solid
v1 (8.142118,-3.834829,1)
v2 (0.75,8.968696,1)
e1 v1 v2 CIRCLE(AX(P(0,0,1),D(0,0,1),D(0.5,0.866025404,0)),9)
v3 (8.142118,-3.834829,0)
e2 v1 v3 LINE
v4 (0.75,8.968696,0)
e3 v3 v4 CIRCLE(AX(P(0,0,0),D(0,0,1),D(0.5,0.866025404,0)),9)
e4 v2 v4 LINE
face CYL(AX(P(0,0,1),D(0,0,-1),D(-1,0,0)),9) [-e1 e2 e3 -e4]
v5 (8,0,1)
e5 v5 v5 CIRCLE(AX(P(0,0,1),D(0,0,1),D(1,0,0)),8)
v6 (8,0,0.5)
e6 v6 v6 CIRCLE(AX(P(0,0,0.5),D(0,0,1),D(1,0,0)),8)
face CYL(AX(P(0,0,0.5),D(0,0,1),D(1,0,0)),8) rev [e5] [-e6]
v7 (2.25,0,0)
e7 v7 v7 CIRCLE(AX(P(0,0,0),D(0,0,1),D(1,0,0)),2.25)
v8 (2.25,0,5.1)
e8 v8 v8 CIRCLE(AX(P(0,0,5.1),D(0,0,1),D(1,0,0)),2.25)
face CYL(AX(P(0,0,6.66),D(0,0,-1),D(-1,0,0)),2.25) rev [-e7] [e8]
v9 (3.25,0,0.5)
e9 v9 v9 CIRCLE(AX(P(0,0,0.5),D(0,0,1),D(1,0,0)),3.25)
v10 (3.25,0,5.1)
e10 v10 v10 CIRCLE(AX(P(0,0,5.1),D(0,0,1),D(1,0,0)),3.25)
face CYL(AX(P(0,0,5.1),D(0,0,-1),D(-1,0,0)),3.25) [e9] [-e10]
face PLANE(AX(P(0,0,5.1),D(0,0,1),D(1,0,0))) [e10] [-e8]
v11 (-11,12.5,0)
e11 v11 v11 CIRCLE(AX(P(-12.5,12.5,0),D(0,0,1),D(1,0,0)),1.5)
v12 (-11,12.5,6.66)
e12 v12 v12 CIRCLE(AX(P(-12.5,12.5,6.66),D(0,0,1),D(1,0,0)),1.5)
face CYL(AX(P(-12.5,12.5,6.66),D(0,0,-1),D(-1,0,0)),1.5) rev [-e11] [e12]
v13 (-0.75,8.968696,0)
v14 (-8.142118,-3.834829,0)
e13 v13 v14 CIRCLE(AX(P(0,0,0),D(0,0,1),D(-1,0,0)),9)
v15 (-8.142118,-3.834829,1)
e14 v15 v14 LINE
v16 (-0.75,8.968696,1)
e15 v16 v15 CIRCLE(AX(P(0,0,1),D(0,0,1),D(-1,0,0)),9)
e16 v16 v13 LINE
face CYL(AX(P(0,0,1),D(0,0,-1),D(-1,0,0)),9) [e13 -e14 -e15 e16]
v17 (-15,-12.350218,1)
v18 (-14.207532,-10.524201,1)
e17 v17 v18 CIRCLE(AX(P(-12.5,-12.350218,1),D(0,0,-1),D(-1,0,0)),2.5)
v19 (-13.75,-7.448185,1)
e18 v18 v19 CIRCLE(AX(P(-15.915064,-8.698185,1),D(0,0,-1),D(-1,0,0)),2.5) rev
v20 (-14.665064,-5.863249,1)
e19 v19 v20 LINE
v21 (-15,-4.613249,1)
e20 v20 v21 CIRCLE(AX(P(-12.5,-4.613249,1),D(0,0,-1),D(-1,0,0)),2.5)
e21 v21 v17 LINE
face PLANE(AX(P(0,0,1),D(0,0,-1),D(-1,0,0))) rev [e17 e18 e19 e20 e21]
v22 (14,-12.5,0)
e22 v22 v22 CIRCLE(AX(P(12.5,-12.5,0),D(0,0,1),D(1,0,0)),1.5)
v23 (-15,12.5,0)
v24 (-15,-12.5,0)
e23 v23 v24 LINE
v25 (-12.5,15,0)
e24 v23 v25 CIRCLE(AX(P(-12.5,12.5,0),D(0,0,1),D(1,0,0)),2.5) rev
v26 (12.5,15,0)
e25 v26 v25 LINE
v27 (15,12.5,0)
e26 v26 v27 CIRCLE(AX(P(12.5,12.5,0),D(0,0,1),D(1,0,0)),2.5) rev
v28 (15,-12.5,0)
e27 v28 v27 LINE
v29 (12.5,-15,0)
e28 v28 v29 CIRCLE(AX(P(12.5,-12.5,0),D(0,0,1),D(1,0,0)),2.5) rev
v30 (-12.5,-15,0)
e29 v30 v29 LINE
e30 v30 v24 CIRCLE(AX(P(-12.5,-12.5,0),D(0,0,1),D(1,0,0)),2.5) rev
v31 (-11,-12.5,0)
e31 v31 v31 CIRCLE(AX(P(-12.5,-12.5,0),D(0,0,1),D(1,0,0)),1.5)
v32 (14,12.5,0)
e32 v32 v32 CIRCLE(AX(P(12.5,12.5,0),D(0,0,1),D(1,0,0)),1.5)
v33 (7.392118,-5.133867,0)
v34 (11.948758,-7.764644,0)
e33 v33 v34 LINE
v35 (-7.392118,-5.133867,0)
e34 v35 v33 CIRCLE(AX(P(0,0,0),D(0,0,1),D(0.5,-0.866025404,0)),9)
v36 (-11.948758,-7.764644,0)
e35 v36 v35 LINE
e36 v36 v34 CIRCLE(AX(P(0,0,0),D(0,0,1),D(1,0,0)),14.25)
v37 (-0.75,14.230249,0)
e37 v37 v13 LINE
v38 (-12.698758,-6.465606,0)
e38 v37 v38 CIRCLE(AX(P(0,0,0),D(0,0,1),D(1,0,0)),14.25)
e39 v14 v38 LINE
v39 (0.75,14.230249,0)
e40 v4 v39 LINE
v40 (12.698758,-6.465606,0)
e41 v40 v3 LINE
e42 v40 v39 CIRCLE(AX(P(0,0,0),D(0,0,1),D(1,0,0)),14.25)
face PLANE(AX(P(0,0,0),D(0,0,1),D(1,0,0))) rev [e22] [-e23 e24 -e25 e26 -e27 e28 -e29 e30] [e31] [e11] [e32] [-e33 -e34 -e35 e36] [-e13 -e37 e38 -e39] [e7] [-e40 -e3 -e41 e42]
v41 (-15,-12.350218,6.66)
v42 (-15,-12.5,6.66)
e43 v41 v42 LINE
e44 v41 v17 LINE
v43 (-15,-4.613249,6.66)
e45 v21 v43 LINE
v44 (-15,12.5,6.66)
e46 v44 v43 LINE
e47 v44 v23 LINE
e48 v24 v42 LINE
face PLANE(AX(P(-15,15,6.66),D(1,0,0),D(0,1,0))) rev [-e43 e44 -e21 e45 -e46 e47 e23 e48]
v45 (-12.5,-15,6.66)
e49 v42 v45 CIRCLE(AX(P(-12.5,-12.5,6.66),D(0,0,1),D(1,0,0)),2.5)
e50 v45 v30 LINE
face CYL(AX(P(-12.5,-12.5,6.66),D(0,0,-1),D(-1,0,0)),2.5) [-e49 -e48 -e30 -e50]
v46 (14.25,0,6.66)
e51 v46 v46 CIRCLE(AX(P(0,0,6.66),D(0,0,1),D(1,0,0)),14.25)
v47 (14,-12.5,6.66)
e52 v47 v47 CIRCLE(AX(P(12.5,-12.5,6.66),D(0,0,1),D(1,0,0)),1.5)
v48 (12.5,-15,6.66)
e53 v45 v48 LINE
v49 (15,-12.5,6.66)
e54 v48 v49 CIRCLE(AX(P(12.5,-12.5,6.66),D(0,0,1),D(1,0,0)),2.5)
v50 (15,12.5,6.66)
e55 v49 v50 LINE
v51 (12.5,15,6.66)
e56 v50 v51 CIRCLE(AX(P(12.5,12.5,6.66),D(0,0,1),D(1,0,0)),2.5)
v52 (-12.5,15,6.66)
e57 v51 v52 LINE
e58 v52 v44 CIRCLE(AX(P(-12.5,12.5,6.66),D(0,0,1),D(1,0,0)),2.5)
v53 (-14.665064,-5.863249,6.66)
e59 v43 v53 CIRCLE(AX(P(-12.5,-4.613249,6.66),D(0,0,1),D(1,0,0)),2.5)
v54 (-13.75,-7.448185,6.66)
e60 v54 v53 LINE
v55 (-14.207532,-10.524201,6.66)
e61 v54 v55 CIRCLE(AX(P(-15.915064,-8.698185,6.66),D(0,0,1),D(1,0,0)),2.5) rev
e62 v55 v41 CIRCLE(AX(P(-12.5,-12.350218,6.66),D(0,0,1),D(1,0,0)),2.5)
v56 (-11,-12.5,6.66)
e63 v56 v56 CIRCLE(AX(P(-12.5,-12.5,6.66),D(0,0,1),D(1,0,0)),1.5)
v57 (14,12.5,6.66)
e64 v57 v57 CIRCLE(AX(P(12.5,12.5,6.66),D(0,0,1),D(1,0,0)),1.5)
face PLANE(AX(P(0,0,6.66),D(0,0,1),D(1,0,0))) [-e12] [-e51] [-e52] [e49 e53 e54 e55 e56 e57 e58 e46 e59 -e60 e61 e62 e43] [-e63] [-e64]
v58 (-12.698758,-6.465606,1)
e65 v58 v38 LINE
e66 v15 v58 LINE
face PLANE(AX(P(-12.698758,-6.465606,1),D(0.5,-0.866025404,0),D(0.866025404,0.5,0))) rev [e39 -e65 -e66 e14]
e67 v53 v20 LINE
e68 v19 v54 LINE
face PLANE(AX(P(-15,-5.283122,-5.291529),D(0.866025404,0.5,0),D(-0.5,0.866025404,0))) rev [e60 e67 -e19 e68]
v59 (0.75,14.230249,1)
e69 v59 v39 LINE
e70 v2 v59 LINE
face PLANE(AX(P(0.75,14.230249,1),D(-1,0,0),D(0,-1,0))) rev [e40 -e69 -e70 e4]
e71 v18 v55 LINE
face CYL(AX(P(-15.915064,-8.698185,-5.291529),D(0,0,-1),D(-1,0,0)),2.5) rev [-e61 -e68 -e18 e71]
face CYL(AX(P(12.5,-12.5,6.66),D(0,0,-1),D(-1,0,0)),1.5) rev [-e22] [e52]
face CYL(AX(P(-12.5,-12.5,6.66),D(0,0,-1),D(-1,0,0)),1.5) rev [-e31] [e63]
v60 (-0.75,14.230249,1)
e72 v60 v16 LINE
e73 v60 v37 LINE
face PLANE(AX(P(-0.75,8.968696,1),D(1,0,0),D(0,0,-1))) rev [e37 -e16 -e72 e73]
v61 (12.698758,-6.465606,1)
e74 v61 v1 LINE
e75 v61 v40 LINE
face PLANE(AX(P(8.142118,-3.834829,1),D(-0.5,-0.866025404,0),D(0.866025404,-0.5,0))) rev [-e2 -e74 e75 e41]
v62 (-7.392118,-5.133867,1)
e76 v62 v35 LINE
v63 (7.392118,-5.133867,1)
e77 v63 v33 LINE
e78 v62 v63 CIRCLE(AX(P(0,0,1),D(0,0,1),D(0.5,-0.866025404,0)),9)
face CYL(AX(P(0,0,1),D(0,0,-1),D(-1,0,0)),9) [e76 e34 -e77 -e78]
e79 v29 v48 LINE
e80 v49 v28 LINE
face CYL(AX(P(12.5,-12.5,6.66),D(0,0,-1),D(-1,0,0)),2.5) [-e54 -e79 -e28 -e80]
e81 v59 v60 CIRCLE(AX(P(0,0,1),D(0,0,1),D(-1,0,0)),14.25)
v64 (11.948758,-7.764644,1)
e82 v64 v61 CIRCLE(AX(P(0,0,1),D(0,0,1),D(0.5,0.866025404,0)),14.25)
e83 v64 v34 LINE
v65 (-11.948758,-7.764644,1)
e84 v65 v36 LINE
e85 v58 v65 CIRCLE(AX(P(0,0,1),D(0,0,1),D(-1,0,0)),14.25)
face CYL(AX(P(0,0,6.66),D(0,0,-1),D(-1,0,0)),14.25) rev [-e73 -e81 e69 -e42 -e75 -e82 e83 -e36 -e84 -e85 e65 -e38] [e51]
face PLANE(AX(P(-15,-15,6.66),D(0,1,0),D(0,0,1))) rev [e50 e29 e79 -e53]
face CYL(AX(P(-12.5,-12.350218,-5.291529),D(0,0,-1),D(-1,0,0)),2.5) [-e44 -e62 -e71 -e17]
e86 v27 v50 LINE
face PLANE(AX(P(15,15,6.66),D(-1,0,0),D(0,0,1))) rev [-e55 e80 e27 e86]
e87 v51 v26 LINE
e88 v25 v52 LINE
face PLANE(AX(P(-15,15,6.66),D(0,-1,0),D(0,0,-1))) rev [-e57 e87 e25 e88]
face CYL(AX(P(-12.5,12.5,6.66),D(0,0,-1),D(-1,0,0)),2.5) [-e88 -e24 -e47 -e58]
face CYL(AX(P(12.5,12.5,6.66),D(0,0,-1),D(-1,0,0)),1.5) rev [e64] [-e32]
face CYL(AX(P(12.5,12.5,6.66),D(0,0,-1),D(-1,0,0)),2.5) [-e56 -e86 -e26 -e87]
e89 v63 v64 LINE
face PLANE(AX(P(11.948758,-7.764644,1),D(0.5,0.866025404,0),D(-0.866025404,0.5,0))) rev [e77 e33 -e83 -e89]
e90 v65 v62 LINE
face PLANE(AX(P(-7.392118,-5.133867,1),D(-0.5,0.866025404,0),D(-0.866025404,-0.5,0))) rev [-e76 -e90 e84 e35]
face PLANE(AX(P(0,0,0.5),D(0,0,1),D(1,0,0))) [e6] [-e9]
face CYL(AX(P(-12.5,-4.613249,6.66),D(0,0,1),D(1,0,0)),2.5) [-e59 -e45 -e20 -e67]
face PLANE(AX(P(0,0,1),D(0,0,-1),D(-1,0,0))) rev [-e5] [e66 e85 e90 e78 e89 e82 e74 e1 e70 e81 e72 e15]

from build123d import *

# Parameters (mm, degrees)
SKETCH1_W           = 30
SKETCH1_H           = 30
SKETCH1_R           = 14.25
SKETCH1_R_2         = 1.5
BOSS_EXTRUDE1_DEPTH = 6.66
BOSS_EXTRUDE2_DEPTH = 1
CIRPATTERN7_COUNT   = 3
SKETCH3_R           = 2.25
CUT_EXTRUDE2_DEPTH  = 23.234108932
SKETCH4_R           = 3.25
SKETCH4_R_2         = 2.25
BOSS_EXTRUDE3_DEPTH = 4.1
FILLET1_R           = 2.5
CUT_EXTRUDE4_START  = -0.5
SKETCH6_R           = 8
SKETCH6_R_2         = 3.25
CUT_EXTRUDE4_DEPTH  = 0.5
CUT_EXTRUDE5_DEPTH  = 5.66
FILLET4_R           = 2.5
FILLET5_R           = 2.5


with BuildPart() as part:
    # Sketch1 → Boss-Extrude1 (new body)
    with BuildSketch(Plane.XY):
        Rectangle(SKETCH1_W, SKETCH1_H)
        Circle(SKETCH1_R, mode=Mode.SUBTRACT)
        with Locations((-12.5, 12.5)):
            Circle(SKETCH1_R_2, mode=Mode.SUBTRACT)
        with Locations((12.5, 12.5)):
            Circle(SKETCH1_R_2, mode=Mode.SUBTRACT)
        with Locations((12.5, -12.5)):
            Circle(SKETCH1_R_2, mode=Mode.SUBTRACT)
        with Locations((-12.5, -12.5)):
            Circle(SKETCH1_R_2, mode=Mode.SUBTRACT)
    extrude(amount=BOSS_EXTRUDE1_DEPTH)

    # Sketch2 → Boss-Extrude2 (add)
    with BuildSketch(Plane.XY):
        with BuildLine():
            Line((-0.75, 8.968695557), (-0.75, 14.230249471))
            ThreePointArc((-0.75, 14.230249471), (-0.375130005, 14.245061512), (0, 14.25))
            Line((0, 14.25), (0, 0))
            Line((0, 0), (-12.340862004, -7.125))
            ThreePointArc((-12.340862004, -7.125), (-12.52415015, -6.797658642), (-12.698757544, -6.465605683))
            Line((-12.698757544, -6.465605683), (-8.142118191, -3.834828726))
            ThreePointArc((-8.142118191, -3.834828726), (-7.794228634, 4.5), (-0.75, 8.968695557))
        make_face()
    boss_extrude2 = extrude(amount=BOSS_EXTRUDE2_DEPTH)

    # CirPattern7: Boss-Extrude2 ×3 about axis
    cirpattern7_axis = Axis((0, 0, 0), (0, 0, 1))
    for i in range(1, CIRPATTERN7_COUNT):
        add(boss_extrude2.rotate(cirpattern7_axis, i * 360 / CIRPATTERN7_COUNT))

    # Sketch3 → Cut-Extrude2 (cut, through all)
    with BuildSketch(Plane.XY):
        with Locations(Location((0, 0, 0), (0, 0, 180))):
            Circle(SKETCH3_R)
    extrude(amount=CUT_EXTRUDE2_DEPTH, mode=Mode.SUBTRACT)

    # Sketch4 → Boss-Extrude3 (add)
    with BuildSketch(Plane.XY.offset(1)):
        with Locations(Location((0, 0, 0), (0, 0, 180))):
            Circle(SKETCH4_R)
        Circle(SKETCH4_R_2, mode=Mode.SUBTRACT)
    extrude(amount=BOSS_EXTRUDE3_DEPTH)

    # Fillet1
    fillet1_edges = [part.edges().sort_by_distance(p)[0] for p in [
        (15, -15, 3.33),
        (-15, -15, 3.33),
        (-15, 15, 3.33),
        (15, 15, 3.33),
    ]]
    fillet(fillet1_edges, radius=FILLET1_R)

    # Sketch6 → Cut-Extrude4 (cut)
    with BuildSketch(Plane.XY.offset(1).offset(CUT_EXTRUDE4_START)):
        Circle(SKETCH6_R)
        Circle(SKETCH6_R_2, mode=Mode.SUBTRACT)
    extrude(amount=CUT_EXTRUDE4_DEPTH, mode=Mode.SUBTRACT)

    # Sketch5 → Cut-Extrude5 (cut)
    with BuildSketch(Plane.XY.offset(6.66)):
        Polygon((-15, -5.283121635), (-12.5, -9.613248654), (-15, -11.056624327), align=None)
    extrude(amount=-CUT_EXTRUDE5_DEPTH, mode=Mode.SUBTRACT)

    # Fillet4
    fillet4_edges = [part.edges().sort_by_distance(p)[0] for p in [
        (-12.5, -9.613248654, 3.83),
    ]]
    fillet(fillet4_edges, radius=FILLET4_R)

    # Fillet5
    # the kernel refuses this fillet: 2.5 mm, written as the material it takes off along each edge
    with BuildSketch(Plane(origin=(-15, -11.056624327, 9.893983241), x_dir=(0, -1, 0), z_dir=(0, 0, -1))) as fillet5_piece_1:
        with BuildLine():
            CenterArc((1.293593296, -2.5), FILLET5_R, 90, 46.920482858)
            Line((-0.532422943, -0.792468245), (-0.715024567, -0.62171507))
            ThreePointArc((-0.715024567, -0.62171507), (-0.409882024, -0.209936491), (-0.216506351, 0.125))
            Line((-0.216506351, 0.125), (0, 0.25))
            Line((0, 0.25), (1.293593296, 0.25))
            Line((1.293593296, 0.25), (1.293593296, 0))
        make_face()
    extrude(amount=8.893983241, mode=Mode.SUBTRACT)
    with BuildSketch(Plane(origin=(-15, -5.283121635, 8.334682453), x_dir=(0.4999999999999945, -0.8660254037844419, 0), z_dir=(0, 0, -1))) as fillet5_piece_2:
        with BuildLine():
            CenterArc((FILLET5_R * 0.267949192431, -FILLET5_R), FILLET5_R, 90, 30)
            Line((-FILLET5_R * 0.232050807569, -FILLET5_R * 0.133974596216), (0, 0))
            Line((0, 0), (FILLET5_R * 0.267949192431, 0))
        make_face()
    extrude(amount=7.334682453, mode=Mode.SUBTRACT)


solid = part.part
